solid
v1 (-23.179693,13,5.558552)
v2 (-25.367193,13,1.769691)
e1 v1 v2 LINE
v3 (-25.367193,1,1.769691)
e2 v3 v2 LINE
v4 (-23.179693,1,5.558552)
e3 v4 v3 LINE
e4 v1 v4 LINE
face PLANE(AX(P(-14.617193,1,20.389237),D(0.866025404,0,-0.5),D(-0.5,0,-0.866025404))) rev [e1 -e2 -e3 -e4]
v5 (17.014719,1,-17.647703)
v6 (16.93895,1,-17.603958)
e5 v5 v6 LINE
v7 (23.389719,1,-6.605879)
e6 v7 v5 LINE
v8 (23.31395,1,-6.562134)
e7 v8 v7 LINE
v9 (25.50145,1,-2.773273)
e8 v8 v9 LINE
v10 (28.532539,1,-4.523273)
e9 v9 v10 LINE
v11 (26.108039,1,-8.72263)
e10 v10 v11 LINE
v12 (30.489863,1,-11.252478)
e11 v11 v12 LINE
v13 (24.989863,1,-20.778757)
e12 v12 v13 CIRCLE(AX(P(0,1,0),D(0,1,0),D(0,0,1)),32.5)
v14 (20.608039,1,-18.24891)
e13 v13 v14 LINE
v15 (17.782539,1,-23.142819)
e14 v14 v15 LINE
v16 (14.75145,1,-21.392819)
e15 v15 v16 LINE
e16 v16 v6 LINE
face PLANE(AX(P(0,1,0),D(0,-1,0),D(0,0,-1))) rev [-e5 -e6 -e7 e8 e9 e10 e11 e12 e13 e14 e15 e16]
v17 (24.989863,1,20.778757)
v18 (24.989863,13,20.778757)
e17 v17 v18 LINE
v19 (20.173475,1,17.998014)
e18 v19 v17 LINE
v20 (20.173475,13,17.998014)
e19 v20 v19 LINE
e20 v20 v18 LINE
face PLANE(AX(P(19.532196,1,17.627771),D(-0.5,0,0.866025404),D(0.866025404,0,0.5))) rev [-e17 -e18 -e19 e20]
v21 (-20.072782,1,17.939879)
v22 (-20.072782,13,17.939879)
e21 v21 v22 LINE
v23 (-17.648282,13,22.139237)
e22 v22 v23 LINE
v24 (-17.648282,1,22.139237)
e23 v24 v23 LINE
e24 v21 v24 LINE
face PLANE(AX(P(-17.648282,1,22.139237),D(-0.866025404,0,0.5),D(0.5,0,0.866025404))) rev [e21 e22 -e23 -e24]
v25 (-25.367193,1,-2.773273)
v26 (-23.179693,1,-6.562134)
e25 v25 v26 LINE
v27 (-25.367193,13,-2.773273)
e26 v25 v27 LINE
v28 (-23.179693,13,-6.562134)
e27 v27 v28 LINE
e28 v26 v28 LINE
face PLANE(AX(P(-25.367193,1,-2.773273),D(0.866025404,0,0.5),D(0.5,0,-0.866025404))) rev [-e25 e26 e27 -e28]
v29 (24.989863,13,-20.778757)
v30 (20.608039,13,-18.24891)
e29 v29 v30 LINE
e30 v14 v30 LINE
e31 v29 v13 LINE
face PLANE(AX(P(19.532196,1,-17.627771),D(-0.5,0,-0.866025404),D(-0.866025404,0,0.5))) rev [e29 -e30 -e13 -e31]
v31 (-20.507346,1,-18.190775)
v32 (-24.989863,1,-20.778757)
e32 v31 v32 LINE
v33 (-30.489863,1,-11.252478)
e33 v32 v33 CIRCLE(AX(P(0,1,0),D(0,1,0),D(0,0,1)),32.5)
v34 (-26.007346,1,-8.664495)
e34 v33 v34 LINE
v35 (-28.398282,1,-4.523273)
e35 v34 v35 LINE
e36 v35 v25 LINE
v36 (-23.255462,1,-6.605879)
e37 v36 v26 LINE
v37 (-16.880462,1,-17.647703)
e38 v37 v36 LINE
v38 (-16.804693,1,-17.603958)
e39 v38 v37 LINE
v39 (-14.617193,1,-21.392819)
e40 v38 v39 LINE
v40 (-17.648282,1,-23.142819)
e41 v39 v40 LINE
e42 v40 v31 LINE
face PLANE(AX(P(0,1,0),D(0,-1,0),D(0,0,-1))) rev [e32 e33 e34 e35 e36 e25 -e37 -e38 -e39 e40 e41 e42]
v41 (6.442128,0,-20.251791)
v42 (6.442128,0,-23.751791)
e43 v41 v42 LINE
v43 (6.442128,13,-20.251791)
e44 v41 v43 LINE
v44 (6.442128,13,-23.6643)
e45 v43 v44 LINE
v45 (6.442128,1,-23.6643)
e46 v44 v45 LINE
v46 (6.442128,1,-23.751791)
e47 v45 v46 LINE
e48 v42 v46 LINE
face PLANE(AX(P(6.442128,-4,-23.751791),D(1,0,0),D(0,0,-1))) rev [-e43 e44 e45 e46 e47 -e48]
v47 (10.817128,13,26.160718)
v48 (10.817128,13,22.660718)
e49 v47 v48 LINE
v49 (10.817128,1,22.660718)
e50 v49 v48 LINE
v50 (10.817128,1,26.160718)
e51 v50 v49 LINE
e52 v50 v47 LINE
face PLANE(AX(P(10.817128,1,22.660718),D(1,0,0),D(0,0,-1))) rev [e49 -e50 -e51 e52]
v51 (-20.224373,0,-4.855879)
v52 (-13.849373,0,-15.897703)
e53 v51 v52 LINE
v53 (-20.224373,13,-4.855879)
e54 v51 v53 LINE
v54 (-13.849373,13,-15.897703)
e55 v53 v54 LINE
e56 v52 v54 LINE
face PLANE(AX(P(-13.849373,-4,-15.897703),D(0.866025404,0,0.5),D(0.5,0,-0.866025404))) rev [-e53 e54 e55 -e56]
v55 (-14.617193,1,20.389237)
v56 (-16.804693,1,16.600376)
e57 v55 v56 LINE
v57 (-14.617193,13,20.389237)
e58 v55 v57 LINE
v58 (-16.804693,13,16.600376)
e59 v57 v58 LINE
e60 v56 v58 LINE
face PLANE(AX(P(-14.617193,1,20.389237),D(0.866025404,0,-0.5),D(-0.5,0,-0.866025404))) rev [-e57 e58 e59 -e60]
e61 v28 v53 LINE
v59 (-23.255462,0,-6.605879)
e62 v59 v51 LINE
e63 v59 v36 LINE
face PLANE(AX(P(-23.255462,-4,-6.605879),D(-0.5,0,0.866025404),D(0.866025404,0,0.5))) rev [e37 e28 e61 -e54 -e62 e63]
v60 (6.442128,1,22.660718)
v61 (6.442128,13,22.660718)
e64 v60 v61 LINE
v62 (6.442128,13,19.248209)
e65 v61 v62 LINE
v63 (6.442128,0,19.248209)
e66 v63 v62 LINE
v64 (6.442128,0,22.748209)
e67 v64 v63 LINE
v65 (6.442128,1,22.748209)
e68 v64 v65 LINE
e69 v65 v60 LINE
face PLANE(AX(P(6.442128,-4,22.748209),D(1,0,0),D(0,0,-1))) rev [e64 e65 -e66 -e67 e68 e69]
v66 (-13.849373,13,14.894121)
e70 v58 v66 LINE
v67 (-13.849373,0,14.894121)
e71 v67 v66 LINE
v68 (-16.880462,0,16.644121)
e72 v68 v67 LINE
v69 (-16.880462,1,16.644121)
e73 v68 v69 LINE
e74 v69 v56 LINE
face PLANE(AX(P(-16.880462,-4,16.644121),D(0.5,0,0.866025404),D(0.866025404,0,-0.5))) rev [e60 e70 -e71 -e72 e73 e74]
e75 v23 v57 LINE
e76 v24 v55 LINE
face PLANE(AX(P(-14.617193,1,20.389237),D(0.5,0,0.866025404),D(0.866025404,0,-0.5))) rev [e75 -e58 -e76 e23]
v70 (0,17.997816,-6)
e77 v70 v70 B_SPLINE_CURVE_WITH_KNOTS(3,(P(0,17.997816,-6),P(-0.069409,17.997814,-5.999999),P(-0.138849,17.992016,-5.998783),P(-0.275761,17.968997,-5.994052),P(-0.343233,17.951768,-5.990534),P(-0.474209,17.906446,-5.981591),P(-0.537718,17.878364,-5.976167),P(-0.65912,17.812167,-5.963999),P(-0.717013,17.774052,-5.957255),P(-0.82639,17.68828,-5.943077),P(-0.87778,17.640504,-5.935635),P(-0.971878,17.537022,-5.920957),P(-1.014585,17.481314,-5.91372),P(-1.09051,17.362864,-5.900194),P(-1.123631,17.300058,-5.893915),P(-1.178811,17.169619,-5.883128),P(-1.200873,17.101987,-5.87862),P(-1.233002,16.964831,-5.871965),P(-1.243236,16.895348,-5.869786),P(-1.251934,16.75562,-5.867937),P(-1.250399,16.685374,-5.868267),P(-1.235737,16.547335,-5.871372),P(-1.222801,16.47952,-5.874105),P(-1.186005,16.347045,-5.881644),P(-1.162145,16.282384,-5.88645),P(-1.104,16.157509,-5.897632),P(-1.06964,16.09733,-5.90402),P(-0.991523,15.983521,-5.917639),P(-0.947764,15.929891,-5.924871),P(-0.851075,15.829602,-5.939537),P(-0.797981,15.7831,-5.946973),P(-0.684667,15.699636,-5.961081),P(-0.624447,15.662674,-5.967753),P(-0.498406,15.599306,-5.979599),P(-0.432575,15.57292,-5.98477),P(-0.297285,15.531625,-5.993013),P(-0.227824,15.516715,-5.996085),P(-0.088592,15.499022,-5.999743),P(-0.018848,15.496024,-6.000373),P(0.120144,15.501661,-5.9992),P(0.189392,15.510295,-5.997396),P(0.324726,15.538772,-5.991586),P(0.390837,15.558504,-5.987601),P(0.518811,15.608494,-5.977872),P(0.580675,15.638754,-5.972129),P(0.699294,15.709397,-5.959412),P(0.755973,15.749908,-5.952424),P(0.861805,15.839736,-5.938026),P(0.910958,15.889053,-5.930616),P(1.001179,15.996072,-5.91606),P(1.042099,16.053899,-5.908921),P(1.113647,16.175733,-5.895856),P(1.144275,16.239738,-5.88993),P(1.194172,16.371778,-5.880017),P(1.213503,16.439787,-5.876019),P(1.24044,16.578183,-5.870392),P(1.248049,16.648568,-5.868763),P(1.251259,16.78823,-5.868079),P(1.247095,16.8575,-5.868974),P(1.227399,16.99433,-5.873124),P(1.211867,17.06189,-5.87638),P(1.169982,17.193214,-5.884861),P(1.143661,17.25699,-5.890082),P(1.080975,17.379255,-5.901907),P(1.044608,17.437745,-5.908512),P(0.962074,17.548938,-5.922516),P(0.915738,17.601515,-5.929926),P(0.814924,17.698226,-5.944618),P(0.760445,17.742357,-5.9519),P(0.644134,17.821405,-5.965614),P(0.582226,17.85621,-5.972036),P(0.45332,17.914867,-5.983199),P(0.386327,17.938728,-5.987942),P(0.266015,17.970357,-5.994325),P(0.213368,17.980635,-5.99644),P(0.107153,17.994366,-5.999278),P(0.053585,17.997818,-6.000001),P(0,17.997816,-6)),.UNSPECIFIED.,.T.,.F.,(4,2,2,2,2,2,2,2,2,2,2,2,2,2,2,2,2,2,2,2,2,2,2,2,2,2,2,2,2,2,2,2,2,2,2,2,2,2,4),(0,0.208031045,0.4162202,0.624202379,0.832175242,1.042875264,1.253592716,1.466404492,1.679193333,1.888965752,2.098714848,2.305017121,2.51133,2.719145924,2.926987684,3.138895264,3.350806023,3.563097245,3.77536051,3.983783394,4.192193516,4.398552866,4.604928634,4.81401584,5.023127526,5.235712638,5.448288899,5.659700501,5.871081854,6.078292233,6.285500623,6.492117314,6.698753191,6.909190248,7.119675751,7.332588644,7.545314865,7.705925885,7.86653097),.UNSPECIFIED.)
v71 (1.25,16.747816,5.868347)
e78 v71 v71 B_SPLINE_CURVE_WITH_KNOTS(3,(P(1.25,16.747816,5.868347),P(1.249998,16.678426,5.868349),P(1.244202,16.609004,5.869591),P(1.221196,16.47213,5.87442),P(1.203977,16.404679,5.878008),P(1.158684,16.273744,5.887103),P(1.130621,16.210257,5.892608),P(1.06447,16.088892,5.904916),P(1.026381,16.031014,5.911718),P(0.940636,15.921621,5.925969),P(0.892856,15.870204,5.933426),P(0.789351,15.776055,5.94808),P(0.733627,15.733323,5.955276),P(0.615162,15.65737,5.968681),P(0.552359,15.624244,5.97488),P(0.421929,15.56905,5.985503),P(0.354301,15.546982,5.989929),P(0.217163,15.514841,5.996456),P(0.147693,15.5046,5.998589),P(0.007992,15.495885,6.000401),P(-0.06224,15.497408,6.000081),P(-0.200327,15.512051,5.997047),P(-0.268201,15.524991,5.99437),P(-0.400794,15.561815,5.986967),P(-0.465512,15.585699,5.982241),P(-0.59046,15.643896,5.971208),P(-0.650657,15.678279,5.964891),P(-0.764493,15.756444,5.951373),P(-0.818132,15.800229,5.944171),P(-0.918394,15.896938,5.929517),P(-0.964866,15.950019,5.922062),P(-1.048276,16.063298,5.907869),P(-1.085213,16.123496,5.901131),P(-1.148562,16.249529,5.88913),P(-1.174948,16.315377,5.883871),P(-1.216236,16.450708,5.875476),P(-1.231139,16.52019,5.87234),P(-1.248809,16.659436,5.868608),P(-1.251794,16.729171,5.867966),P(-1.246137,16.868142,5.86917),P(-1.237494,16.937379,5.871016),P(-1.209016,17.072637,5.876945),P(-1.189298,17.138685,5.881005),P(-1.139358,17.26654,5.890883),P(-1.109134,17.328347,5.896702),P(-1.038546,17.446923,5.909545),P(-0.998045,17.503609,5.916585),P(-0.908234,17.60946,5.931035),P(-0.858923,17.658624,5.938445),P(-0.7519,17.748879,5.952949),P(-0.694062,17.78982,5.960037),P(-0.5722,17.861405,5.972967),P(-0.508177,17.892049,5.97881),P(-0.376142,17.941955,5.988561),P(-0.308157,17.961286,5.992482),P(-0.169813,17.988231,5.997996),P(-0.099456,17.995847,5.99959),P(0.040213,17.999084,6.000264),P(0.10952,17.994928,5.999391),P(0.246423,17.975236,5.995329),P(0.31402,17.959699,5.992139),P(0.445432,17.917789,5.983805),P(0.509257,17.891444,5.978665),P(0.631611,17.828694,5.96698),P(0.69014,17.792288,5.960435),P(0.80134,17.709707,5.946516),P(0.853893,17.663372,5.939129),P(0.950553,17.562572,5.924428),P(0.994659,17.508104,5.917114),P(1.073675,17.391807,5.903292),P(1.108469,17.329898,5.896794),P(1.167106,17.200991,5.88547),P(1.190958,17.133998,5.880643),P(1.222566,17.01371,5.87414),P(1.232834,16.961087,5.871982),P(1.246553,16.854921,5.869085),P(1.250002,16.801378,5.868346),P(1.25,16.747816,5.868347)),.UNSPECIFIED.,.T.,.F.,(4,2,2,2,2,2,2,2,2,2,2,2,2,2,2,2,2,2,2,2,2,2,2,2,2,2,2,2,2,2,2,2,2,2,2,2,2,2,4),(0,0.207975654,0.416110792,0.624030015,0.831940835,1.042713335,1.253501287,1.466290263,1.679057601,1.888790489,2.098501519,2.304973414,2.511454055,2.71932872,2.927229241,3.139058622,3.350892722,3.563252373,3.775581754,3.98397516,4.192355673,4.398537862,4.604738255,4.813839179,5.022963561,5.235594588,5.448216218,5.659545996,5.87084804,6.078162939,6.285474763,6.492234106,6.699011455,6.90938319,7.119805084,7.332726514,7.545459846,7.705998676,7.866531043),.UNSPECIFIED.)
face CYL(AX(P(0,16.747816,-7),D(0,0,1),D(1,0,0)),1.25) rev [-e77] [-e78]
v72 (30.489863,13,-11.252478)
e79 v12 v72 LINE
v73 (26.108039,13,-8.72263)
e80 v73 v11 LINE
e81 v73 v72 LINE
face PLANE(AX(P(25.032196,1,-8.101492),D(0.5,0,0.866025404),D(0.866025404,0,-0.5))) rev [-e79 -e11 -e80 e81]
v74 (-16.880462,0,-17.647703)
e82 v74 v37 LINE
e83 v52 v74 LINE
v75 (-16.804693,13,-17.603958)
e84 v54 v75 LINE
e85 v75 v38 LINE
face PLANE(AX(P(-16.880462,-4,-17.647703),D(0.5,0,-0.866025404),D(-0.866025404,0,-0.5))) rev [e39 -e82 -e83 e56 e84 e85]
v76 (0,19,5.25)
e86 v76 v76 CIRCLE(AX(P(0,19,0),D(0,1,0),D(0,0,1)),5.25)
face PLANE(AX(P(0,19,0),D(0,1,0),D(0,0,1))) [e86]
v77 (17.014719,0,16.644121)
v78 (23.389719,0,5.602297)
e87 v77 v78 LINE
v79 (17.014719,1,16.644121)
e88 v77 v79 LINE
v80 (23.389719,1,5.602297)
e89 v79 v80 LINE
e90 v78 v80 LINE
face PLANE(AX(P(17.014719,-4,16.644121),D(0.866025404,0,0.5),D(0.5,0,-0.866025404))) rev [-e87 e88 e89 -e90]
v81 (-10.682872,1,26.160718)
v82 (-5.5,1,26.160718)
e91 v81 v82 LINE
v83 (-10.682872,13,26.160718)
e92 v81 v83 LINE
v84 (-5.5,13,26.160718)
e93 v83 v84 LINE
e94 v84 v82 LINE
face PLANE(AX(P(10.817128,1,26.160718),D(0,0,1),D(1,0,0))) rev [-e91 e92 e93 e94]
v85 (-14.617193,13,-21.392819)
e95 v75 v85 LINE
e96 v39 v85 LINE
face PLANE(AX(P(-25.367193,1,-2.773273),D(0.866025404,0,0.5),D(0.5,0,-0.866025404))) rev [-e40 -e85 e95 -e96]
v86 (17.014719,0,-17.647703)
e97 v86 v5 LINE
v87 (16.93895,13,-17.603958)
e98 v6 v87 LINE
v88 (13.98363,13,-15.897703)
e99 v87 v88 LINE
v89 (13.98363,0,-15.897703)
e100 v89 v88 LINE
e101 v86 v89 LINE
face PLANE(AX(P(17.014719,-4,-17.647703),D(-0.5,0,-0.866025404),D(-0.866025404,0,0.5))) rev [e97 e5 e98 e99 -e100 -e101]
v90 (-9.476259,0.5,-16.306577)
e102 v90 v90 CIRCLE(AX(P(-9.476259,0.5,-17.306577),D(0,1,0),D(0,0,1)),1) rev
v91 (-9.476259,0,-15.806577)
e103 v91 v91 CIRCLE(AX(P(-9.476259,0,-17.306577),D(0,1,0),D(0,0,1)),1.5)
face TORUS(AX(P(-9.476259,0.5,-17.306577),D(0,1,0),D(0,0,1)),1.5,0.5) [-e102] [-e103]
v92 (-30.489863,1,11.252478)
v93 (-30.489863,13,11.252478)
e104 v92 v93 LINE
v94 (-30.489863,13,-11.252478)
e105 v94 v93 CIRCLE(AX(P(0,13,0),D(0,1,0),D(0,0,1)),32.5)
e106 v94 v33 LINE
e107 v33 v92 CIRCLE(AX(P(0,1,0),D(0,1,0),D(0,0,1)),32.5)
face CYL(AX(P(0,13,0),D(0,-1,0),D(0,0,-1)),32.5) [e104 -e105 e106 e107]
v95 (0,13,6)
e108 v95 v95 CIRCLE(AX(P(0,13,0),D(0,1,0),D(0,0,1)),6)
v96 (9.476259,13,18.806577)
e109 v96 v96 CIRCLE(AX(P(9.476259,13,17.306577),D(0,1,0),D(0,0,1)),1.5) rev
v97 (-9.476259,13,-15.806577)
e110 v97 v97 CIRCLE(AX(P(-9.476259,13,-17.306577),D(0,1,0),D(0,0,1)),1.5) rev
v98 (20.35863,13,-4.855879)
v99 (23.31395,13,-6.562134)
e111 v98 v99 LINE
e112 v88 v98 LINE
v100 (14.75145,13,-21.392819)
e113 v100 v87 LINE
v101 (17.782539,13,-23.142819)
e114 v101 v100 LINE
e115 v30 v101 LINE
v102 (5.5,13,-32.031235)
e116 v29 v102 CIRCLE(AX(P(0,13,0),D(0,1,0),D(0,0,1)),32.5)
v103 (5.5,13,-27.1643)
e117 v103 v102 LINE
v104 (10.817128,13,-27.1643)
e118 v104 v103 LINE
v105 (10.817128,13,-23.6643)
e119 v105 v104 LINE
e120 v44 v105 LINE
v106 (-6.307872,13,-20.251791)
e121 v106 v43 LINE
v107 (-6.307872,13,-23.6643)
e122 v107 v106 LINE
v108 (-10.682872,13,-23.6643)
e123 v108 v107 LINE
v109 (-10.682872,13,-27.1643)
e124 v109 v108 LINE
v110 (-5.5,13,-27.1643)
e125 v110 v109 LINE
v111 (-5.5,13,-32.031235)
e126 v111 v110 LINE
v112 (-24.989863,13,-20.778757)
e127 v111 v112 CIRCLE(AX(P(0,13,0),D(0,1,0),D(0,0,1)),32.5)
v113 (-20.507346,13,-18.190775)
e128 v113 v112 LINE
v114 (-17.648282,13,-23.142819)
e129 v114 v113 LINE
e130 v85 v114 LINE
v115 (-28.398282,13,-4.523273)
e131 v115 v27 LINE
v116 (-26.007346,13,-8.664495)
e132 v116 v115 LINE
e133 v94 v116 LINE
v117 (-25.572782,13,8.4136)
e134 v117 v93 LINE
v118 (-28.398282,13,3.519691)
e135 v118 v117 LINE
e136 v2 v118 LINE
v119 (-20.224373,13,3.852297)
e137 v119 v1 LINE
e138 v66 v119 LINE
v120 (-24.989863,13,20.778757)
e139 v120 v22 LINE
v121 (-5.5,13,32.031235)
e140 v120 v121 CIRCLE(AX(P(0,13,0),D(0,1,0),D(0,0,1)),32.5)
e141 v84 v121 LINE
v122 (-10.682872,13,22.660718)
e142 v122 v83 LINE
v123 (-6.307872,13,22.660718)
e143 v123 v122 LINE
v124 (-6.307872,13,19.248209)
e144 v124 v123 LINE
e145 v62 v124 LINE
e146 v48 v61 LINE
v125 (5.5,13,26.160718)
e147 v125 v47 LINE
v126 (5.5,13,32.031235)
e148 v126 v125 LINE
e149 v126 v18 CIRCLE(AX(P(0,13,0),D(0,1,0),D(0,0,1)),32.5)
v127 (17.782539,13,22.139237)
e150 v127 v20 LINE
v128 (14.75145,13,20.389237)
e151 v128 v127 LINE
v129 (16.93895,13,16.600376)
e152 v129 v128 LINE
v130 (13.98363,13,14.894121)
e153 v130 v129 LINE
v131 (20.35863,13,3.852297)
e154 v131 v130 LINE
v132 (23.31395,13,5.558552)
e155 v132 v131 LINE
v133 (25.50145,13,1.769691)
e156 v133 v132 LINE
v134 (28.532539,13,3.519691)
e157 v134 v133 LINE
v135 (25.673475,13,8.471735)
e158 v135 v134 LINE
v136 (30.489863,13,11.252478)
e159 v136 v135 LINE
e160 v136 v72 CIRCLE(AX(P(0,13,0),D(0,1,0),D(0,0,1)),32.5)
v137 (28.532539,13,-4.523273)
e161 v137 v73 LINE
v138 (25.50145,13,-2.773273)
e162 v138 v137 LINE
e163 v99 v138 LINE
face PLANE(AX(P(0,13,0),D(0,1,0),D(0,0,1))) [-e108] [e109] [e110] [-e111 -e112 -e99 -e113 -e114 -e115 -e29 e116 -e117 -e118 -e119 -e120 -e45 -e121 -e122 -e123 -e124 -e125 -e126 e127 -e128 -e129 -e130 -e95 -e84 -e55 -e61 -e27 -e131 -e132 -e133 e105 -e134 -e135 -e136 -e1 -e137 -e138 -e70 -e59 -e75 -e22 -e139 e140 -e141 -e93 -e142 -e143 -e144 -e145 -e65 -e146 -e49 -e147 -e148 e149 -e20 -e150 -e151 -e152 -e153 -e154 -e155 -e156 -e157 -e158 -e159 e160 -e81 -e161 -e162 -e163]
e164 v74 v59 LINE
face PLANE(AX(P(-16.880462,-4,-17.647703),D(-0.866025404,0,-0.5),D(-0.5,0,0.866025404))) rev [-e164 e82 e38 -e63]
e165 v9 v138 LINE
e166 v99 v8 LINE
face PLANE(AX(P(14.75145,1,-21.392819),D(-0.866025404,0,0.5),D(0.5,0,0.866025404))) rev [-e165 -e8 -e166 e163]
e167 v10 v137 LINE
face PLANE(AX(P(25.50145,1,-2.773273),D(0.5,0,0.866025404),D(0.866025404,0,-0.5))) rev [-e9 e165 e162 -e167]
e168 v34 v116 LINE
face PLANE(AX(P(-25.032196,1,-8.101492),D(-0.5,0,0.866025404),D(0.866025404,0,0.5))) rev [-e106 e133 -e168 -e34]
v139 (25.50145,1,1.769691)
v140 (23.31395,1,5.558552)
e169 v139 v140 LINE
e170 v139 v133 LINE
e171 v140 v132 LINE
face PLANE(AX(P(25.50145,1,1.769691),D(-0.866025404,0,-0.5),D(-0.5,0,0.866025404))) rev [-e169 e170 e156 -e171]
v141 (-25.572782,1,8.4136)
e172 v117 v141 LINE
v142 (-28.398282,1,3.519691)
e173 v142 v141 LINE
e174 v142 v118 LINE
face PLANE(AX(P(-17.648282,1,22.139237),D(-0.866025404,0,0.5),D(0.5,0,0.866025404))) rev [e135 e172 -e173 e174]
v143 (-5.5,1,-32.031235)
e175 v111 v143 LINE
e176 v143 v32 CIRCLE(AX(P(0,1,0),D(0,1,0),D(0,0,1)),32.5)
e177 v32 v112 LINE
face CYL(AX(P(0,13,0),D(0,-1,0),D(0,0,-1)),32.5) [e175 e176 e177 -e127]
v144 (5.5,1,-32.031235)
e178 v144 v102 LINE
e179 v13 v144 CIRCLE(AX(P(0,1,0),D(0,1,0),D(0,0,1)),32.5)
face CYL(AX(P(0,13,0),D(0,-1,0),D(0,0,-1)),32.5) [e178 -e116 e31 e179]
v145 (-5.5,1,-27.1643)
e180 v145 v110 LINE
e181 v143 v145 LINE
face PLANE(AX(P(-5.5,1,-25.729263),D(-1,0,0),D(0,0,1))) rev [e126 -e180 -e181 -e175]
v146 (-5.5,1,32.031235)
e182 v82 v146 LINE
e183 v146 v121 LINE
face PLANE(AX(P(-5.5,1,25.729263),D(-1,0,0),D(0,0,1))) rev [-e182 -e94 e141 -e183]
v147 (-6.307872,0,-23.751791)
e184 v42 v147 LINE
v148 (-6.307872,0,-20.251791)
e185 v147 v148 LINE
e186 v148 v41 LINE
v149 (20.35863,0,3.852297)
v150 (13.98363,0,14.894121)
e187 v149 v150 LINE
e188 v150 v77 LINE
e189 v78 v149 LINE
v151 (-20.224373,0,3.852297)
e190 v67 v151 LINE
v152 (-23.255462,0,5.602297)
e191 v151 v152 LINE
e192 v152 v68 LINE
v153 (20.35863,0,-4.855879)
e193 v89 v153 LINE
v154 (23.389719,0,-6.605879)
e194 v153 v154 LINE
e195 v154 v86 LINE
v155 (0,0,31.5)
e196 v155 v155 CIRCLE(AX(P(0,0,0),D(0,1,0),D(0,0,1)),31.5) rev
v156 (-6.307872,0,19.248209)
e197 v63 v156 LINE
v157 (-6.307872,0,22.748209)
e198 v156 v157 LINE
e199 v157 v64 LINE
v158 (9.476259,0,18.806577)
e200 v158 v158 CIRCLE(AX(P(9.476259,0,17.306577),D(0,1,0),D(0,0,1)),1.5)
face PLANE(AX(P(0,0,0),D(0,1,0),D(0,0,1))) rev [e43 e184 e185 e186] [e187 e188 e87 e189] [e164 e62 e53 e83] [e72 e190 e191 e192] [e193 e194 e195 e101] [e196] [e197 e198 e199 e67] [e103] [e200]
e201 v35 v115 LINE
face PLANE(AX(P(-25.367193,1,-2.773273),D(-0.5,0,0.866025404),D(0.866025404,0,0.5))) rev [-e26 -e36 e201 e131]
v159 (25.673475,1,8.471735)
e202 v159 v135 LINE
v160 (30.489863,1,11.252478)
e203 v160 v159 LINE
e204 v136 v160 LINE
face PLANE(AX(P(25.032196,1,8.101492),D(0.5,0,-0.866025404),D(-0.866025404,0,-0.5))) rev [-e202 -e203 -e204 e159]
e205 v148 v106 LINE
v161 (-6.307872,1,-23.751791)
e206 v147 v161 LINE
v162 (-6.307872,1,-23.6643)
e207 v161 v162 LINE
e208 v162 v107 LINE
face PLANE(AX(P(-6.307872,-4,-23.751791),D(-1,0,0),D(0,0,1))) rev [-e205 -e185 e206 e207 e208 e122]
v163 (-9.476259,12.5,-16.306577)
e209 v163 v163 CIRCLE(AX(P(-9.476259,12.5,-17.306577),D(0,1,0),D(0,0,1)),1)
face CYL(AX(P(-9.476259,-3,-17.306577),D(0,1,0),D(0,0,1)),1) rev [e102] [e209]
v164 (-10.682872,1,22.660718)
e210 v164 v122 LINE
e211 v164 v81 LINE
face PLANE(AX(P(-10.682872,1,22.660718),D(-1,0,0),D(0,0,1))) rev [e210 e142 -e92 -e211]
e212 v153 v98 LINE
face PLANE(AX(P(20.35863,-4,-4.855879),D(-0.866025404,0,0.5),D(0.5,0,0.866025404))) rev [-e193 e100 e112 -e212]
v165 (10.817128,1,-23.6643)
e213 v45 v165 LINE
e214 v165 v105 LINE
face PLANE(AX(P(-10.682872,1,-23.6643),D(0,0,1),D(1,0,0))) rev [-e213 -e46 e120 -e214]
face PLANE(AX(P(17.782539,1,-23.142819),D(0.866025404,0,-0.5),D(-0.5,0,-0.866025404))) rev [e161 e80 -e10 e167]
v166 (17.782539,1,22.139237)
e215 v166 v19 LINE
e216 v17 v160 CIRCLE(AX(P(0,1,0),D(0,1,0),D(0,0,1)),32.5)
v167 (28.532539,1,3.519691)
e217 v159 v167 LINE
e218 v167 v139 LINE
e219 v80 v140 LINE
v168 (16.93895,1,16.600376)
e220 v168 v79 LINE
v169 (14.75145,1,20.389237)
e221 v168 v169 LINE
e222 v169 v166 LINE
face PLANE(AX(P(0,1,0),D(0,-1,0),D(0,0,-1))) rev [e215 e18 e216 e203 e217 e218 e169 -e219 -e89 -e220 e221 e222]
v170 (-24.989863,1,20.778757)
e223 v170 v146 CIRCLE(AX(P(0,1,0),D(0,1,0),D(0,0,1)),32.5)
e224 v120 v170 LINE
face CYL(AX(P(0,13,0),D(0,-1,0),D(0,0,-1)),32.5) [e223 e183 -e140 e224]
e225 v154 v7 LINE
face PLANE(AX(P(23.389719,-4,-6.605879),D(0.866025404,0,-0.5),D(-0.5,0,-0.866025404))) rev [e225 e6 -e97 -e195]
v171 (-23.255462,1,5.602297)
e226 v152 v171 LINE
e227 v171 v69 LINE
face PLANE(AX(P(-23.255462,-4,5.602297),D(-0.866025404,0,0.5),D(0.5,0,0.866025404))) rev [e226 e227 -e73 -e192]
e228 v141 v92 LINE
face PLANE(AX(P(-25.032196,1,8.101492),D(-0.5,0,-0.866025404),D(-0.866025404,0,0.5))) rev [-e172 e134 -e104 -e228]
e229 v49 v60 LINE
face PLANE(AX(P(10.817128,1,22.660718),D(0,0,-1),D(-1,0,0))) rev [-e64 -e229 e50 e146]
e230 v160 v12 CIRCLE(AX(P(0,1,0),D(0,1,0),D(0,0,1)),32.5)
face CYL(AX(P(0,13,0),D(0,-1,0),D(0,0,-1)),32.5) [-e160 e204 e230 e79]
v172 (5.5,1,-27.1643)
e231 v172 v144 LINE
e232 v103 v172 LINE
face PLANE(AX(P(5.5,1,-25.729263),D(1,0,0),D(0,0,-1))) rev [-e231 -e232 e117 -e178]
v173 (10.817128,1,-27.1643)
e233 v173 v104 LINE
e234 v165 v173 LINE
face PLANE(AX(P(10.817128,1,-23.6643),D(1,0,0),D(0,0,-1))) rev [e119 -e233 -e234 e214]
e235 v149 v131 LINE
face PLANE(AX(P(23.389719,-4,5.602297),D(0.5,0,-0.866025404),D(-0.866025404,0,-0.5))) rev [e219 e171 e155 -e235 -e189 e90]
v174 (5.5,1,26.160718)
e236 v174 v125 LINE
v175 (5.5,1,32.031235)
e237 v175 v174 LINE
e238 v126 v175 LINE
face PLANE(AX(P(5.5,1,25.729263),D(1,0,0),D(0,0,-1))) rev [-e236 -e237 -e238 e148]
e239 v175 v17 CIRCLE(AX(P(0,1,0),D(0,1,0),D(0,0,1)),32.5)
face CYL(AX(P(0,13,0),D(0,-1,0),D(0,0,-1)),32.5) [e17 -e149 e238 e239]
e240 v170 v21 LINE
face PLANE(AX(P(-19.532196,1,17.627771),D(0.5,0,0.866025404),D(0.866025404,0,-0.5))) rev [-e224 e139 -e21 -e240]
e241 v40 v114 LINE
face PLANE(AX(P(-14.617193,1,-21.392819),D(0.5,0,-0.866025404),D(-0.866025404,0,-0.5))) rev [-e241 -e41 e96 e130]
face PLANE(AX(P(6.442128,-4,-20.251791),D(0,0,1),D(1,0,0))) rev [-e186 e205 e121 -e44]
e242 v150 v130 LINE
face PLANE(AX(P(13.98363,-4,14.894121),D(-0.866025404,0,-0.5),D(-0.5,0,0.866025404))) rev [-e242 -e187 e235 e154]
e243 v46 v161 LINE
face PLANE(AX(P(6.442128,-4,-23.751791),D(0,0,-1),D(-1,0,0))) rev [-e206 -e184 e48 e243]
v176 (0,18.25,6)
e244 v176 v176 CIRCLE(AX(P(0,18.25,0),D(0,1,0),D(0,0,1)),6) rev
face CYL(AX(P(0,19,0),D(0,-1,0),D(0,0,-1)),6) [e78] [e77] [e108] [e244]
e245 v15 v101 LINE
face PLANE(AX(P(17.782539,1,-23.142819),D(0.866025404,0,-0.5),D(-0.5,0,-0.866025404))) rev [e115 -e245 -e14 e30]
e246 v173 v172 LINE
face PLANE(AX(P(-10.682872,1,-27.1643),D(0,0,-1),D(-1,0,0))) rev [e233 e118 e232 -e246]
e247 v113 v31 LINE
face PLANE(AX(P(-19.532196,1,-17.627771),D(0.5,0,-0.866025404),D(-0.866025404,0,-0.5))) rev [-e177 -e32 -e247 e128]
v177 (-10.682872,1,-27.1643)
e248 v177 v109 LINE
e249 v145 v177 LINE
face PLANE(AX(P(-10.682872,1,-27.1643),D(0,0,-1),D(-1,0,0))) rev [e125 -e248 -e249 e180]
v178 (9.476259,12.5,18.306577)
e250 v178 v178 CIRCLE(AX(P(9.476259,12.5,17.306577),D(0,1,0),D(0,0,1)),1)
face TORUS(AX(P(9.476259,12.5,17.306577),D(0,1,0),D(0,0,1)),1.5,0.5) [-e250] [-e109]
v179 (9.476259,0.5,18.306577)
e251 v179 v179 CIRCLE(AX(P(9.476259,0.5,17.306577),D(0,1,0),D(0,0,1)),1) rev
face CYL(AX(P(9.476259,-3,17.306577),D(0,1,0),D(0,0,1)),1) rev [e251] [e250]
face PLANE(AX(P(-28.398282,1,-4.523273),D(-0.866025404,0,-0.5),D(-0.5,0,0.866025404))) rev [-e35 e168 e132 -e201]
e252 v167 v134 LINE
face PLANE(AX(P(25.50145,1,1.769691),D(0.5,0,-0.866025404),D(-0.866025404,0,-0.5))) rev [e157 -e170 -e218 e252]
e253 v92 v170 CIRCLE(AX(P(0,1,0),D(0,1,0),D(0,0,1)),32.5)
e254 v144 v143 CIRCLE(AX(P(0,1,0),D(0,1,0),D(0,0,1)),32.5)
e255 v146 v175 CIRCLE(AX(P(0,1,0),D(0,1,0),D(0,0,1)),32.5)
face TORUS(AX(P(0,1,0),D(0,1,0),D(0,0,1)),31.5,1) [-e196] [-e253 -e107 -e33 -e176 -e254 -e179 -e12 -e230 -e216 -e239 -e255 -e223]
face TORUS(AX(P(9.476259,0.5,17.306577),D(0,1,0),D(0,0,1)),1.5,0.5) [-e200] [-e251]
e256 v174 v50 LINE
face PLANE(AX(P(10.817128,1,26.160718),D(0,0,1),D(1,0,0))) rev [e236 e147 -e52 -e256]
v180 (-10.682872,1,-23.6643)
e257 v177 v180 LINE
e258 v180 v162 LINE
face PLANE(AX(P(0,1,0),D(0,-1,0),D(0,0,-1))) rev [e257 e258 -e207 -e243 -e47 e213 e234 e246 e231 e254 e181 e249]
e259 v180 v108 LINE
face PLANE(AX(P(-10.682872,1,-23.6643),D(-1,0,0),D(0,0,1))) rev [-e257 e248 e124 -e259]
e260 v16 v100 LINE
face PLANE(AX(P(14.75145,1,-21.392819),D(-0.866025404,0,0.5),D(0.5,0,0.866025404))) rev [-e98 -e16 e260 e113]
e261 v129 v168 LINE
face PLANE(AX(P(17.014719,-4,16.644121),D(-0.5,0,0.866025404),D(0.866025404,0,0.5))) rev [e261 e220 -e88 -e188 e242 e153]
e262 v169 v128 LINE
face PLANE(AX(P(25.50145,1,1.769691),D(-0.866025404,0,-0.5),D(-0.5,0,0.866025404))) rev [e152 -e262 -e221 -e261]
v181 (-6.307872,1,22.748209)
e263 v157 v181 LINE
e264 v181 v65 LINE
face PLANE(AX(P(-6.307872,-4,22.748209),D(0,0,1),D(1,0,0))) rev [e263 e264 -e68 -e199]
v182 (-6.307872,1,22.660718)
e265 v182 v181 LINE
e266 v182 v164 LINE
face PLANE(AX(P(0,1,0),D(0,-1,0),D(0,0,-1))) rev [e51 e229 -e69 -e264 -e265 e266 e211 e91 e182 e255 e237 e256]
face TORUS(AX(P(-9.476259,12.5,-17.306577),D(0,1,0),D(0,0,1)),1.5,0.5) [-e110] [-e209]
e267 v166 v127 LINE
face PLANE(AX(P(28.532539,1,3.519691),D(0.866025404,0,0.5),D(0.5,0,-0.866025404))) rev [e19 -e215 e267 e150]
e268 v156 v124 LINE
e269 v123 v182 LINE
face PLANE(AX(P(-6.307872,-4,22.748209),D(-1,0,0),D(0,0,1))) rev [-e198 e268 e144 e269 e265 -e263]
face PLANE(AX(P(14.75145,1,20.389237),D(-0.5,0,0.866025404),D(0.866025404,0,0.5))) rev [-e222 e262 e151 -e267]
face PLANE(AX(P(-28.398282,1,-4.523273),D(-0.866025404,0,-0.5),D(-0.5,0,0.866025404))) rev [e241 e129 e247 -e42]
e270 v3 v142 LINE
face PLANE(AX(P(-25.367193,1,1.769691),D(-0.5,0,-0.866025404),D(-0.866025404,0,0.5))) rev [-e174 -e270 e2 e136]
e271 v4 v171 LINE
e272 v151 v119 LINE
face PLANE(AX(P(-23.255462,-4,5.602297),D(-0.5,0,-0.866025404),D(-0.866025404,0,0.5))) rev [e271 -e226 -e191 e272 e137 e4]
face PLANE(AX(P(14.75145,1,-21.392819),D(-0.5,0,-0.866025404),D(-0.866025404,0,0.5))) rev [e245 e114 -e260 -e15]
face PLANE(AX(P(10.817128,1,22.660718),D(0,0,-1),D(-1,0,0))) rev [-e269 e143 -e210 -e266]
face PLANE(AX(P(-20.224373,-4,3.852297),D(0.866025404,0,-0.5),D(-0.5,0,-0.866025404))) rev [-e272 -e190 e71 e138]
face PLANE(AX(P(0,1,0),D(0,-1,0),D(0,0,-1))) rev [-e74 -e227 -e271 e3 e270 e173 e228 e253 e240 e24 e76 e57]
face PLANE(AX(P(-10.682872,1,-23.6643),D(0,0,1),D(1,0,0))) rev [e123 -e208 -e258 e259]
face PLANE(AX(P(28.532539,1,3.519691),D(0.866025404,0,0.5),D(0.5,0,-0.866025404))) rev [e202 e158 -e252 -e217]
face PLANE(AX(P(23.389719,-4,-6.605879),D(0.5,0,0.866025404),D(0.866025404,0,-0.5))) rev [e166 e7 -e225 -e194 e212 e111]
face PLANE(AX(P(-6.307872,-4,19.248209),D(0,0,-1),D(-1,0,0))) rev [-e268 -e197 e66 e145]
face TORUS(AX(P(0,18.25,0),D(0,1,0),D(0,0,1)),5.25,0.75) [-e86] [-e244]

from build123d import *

# Parameters (mm, degrees)
SKETCH1_R           = 32.5
BOSS_EXTRUDE1_DEPTH = 13
SKETCH15_W          = 12.75
SKETCH15_H          = 3.5
CUT_EXTRUDE6_DEPTH  = 17
SKETCH17_W          = 21.5
SKETCH17_H          = 3.5
CUT_EXTRUDE7_DEPTH  = 12
SKETCH18_W          = 11
SKETCH18_H          = 8.891078246
CUT_EXTRUDE8_DEPTH  = 12
SKETCH19_R          = 1
CUT_EXTRUDE9_DEPTH  = 16
SKETCH21_R          = 6
BOSS_EXTRUDE3_DEPTH = 6
SKETCH24_R          = 1.25
CUT_EXTRUDE10_DEPTH = 13
FILLET4_R           = 0.5
FILLET5_R           = 0.5
FILLET7_R           = 0.75


with BuildPart() as part:
    # Sketch1 → Boss-Extrude1 (new body)
    with BuildSketch(Plane(origin=(0, 0, 0), x_dir=(1, 0, 0), z_dir=(0, 1, 0))):
        with Locations(Location((0, 0, 0), (0, 0, 90))):
            Circle(SKETCH1_R)
    extrude(amount=BOSS_EXTRUDE1_DEPTH)

    # Sketch15 → Cut-Extrude6 (cut)
    with BuildSketch(Plane(origin=(0.067128405, 13, -0.501790944), x_dir=(1, 0, 0), z_dir=(0, 1, 0))):
        Polygon((-13.916501725, 15.395911949), (-20.291501725, 4.354088051), (-23.322590638, 6.104088051), (-16.947590638, 17.145911949), align=None)
        with Locations((0, 21.5)):
            Rectangle(SKETCH15_W, SKETCH15_H)
        Polygon((-20.291501725, -4.354088051), (-13.916501725, -15.395911949), (-16.947590638, -17.145911949), (-23.322590638, -6.104088051), align=None)
        with Locations((0, -21.5)):
            Rectangle(SKETCH15_W, SKETCH15_H)
        Polygon((13.916501725, -15.395911949), (20.291501725, -4.354088051), (23.322590638, -6.104088051), (16.947590638, -17.145911949), align=None)
        Polygon((20.291501725, 4.354088051), (13.916501725, 15.395911949), (16.947590638, 17.145911949), (23.322590638, 6.104088051), align=None)
    extrude(amount=-CUT_EXTRUDE6_DEPTH, mode=Mode.SUBTRACT)

    # Sketch17 → Cut-Extrude7 (cut)
    with BuildSketch(Plane(origin=(0.067128405, 13, -0.501790944), x_dir=(1, 0, 0), z_dir=(0, 1, 0))):
        Polygon((-17.715410458, -22.641027784), (-28.465410458, -4.021481603), (-25.434321545, -2.271481603), (-14.684321545, -20.891027784), align=None)
        with Locations((0, -24.912509387)):
            Rectangle(SKETCH17_W, SKETCH17_H)
        Polygon((-28.465410458, 4.021481603), (-17.715410458, 22.641027784), (-14.684321545, 20.891027784), (-25.434321545, 2.271481603), align=None)
        with Locations((0, 24.912509387)):
            Rectangle(SKETCH17_W, SKETCH17_H)
        Polygon((17.715410458, 22.641027784), (28.465410458, 4.021481603), (25.434321545, 2.271481603), (14.684321545, 20.891027784), align=None)
        Polygon((28.465410458, -4.021481603), (17.715410458, -22.641027784), (14.684321545, -20.891027784), (25.434321545, -2.271481603), align=None)
    extrude(amount=-CUT_EXTRUDE7_DEPTH, mode=Mode.SUBTRACT)

    # Sketch18 → Cut-Extrude8 (cut)
    with BuildSketch(Plane(origin=(0, 13, 0), x_dir=(1, 0, 0), z_dir=(0, 1, 0))):
        Polygon((-25.032195505, -8.101491852), (-19.532195505, -17.627771294), (-27.232095133, -22.073310417), (-32.732095133, -12.547030975), align=None)
        with Locations((0, -30.174802269)):
            Rectangle(SKETCH18_W, SKETCH18_H)
        Polygon((-19.532195505, 17.627771294), (-25.032195505, 8.101491852), (-32.732095133, 12.547030975), (-27.232095133, 22.073310417), align=None)
        with Locations((0, 30.174802269)):
            Rectangle(SKETCH18_W, SKETCH18_H)
        Polygon((25.032195505, 8.101491852), (19.532195505, 17.627771294), (27.232095133, 22.073310417), (32.732095133, 12.547030975), align=None)
        Polygon((19.532195505, -17.627771294), (25.032195505, -8.101491852), (32.732095133, -12.547030975), (27.232095133, -22.073310417), align=None)
    extrude(amount=-CUT_EXTRUDE8_DEPTH, mode=Mode.SUBTRACT)

    # Sketch19 → Cut-Extrude9 (cut)
    with BuildSketch(Plane(origin=(0, 13, 0), x_dir=(1, 0, 0), z_dir=(0, 1, 0))):
        with Locations(Location((-9.476258541, 17.306577458, 0), (0, 0, 270))):
            Circle(SKETCH19_R)
        with Locations(Location((9.476258541, -17.306577458, 0), (0, 0, 270))):
            Circle(SKETCH19_R)
    extrude(amount=-CUT_EXTRUDE9_DEPTH, mode=Mode.SUBTRACT)

    # Sketch21 → Boss-Extrude3 (add)
    with BuildSketch(Plane(origin=(0, 13, 0), x_dir=(1, 0, 0), z_dir=(0, 1, 0))):
        with Locations(Location((0, 0, 0), (0, 0, 270))):
            Circle(SKETCH21_R)
    extrude(amount=BOSS_EXTRUDE3_DEPTH)

    # Sketch24 → Cut-Extrude10 (cut)
    with BuildSketch(Plane.XY.offset(6)):
        with Locations(Location((0, 16.747816345, 0), (0, 0, 90.000000049))):
            Circle(SKETCH24_R)
    extrude(amount=-CUT_EXTRUDE10_DEPTH, mode=Mode.SUBTRACT)

    # Fillet4
    fillet4_edges = [part.edges().sort_by_distance(p)[0] for p in [
        (-9.476258541, 13, -18.306577458),
        (9.476258541, 13, 16.306577458),
    ]]
    fillet(fillet4_edges, radius=FILLET4_R)

    # Fillet5
    fillet5_edges = [part.edges().sort_by_distance(p)[0] for p in [
        (-9.476258541, 0, -18.306577458),
        (9.476258541, 0, 16.306577458),
    ]]
    fillet(fillet5_edges, radius=FILLET5_R)

    # Fillet6: read off the stored shape, not the designer's step
    # Fillet6 outline → Fillet6 (revolve, cut)
    with BuildSketch(Plane.XY):
        with BuildLine():
            ThreePointArc((32.5, 1), (32.207106781, 0.292893219), (31.5, 0))
            Line((31.5, 0), (32.5, 0))
            Line((32.5, 0), (32.5, 1))
        make_face()
    revolve(axis=Axis((0, 0, 0), (0, 1, 0)), mode=Mode.SUBTRACT)

    # Fillet7
    fillet7_edges = [part.edges().sort_by_distance(p)[0] for p in [
        (0, 19, -6),
    ]]
    fillet(fillet7_edges, radius=FILLET7_R)


solid = part.part
